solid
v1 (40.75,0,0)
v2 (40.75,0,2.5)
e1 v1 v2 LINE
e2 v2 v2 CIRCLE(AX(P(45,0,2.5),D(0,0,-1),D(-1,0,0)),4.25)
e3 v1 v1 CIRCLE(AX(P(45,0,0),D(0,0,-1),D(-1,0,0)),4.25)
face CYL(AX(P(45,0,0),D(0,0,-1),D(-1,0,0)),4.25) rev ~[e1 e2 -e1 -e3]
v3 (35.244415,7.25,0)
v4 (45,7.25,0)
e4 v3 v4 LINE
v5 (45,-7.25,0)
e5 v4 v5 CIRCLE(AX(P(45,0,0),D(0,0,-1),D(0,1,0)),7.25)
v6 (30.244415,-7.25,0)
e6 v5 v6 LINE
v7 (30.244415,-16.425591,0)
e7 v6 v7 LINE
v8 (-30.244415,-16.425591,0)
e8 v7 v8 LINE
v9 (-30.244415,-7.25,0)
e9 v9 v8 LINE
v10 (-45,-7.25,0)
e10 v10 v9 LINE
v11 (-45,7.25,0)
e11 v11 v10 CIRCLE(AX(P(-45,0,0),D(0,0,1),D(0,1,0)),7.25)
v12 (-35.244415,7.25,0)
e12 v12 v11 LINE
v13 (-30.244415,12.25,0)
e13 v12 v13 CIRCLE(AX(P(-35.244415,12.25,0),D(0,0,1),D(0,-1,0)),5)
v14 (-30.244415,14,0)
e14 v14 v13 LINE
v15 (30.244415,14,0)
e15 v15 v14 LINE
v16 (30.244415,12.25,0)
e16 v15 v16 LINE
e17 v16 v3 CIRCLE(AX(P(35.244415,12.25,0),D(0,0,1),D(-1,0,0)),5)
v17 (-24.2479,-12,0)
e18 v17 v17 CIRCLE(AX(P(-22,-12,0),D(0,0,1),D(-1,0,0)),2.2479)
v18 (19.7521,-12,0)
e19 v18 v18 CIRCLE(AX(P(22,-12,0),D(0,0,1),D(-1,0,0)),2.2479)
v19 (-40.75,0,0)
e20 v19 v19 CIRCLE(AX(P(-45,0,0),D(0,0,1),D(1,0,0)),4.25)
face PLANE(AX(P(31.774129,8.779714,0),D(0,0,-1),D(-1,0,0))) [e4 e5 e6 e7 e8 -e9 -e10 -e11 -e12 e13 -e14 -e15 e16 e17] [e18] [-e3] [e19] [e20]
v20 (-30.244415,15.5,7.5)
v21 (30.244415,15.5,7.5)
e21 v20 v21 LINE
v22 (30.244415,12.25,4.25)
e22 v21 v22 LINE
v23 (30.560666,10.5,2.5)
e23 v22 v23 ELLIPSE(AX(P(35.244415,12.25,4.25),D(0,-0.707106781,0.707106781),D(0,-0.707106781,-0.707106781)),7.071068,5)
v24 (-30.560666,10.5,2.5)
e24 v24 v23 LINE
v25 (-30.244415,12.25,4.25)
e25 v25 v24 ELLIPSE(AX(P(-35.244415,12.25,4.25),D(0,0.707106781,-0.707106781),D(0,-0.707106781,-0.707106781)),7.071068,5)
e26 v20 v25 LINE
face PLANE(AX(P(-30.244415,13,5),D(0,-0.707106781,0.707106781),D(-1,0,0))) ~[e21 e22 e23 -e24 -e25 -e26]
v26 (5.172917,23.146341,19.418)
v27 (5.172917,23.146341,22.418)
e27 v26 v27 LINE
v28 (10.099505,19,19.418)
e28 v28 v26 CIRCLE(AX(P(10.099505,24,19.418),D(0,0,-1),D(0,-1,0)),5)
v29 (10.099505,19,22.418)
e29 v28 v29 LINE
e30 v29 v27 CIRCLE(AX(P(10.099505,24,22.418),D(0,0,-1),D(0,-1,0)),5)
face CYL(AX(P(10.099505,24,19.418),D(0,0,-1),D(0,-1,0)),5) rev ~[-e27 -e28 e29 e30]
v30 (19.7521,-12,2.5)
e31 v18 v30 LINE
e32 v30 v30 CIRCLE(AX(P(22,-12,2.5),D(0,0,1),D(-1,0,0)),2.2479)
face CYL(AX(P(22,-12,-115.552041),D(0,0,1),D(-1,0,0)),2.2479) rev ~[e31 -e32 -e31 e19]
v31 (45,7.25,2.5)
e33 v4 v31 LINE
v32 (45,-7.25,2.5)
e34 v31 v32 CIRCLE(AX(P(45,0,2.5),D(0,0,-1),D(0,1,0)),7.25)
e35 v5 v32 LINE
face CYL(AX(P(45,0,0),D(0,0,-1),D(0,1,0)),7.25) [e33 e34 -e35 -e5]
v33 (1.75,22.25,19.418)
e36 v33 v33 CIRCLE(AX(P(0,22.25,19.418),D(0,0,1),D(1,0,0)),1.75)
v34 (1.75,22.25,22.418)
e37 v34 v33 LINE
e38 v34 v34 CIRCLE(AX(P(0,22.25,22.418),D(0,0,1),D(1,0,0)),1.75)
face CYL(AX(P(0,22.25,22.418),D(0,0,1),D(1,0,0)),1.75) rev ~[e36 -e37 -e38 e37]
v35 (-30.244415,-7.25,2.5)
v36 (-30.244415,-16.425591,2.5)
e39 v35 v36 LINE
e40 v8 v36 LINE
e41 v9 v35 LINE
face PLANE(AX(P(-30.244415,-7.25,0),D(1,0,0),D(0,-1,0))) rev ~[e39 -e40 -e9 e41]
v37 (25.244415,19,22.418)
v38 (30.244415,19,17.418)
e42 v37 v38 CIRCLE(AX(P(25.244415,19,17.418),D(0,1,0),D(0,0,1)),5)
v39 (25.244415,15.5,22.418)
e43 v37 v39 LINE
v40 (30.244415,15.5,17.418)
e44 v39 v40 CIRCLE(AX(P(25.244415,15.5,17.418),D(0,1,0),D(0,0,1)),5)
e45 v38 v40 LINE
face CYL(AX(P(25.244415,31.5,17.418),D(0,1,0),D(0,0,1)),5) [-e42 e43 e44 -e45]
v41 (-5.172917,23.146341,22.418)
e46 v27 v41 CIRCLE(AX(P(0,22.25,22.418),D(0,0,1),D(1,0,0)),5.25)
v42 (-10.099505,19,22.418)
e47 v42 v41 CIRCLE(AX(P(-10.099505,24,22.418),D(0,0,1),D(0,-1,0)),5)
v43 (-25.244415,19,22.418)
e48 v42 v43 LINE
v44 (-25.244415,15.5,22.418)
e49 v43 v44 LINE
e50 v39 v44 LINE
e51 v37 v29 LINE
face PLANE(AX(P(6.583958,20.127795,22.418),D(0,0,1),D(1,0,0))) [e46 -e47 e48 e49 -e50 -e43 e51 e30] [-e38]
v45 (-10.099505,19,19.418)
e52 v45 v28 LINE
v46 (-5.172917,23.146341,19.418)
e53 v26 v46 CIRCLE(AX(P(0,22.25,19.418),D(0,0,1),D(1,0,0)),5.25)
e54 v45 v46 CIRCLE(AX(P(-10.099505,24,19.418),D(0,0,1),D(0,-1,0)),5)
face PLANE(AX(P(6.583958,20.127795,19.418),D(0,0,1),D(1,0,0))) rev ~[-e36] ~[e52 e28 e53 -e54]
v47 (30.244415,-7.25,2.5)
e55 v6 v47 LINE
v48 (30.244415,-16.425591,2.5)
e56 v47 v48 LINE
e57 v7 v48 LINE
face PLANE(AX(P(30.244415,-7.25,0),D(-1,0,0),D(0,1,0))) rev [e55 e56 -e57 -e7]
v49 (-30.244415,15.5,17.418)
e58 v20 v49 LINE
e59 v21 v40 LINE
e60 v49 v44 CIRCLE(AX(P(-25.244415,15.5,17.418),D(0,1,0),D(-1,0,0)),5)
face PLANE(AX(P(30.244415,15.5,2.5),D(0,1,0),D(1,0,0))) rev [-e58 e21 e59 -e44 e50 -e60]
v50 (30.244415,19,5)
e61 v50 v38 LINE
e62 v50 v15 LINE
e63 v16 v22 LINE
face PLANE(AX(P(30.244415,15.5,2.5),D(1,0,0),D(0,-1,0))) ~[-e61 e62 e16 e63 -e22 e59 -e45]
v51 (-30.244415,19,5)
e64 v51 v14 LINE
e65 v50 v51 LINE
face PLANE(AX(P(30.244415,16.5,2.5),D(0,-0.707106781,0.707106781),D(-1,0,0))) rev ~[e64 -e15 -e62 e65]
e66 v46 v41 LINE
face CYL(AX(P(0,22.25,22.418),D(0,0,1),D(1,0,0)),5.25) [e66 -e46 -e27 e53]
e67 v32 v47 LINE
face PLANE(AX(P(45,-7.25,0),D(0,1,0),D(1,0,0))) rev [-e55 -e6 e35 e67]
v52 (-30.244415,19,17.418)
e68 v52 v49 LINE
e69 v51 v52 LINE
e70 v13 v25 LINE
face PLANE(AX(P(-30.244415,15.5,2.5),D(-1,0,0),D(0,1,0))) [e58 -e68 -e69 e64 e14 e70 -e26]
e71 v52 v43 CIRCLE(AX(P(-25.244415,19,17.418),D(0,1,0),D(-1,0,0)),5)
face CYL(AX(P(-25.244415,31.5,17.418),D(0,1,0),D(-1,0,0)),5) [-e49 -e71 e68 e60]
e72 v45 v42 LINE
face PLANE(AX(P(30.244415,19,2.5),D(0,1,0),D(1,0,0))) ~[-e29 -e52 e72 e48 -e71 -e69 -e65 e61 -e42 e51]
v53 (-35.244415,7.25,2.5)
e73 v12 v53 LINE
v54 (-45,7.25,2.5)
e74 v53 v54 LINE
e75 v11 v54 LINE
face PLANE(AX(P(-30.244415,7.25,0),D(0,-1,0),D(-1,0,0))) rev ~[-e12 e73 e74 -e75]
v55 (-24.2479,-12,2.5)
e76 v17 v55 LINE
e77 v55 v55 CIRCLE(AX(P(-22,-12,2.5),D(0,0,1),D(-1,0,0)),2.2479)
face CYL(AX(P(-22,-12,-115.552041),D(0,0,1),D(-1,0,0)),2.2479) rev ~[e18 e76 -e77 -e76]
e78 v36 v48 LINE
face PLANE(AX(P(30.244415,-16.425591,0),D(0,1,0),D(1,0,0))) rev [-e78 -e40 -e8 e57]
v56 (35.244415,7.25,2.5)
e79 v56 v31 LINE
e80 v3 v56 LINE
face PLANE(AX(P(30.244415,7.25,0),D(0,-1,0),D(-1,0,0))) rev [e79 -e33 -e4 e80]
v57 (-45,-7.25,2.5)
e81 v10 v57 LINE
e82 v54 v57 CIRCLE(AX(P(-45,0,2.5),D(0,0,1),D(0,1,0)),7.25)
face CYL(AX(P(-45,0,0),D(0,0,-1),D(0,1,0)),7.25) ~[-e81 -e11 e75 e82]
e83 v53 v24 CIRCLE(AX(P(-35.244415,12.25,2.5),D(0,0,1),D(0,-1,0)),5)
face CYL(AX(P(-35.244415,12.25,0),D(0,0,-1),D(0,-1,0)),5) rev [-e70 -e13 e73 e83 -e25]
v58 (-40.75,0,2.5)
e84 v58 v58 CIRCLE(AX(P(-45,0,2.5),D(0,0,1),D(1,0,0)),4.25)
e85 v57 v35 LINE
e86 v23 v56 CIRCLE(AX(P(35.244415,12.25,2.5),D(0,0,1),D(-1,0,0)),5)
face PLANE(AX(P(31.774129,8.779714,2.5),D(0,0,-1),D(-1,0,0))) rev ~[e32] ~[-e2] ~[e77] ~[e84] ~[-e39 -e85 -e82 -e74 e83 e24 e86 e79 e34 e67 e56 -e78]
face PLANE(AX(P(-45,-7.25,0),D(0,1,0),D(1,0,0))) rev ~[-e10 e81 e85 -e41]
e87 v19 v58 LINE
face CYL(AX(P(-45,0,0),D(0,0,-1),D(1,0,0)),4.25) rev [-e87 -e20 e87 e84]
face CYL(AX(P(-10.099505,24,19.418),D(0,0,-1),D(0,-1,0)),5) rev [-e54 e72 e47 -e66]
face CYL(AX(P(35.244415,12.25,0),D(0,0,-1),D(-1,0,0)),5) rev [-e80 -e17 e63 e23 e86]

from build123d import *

# Parameters (mm, degrees)
F0_R        = 4.25
F1_DEPTH    = 2.5
F2_W        = 30.2444149011
F2_H        = 3.5
F3_DEPTH    = 19.918
F5_R        = 1.75
F6_DEPTH    = 3
F8_D        = 4.4958
F9_T1_DEPTH = 2.5
F9_T3_DEPTH = 3
F9_T5_DEPTH = 28.5
F10_SIZE    = 5


# Not quite as in the source:
# - a fillet or chamfer that OpenCascade refuses, or shapes differently, is made with other operations: its cross-section is extruded or revolved along the edge and cut away or added


with BuildPart() as f1:
    # F0 (on Top) → F1 (new body)
    with BuildSketch(Plane.XY):
        with BuildLine():
            Line((-30.2444149011, 7.25), (-45, 7.25))
            ThreePointArc((-45, 7.25), (-52.25, 0), (-45, -7.25))
            Line((-45, -7.25), (-30.2444149011, -7.25))
            Line((-30.2444149011, -7.25), (-30.2444149011, -16.4255911708))
            Line((-30.2444149011, -16.4255911708), (0, -16.4255911708))
            Line((0, -16.4255911708), (0, 19))
            Line((0, 19), (-30.2444149011, 19))
            Line((-30.2444149011, 19), (-30.2444149011, 7.25))
        make_face()
        with Locations((-45, 0)):
            Circle(F0_R, mode=Mode.SUBTRACT)
    extrude(amount=F1_DEPTH)

    # F2 (on face) → F3 (join)
    with BuildSketch(Plane.XY.offset(2.5)):
        with Locations((-15.1222074506, 17.25)):
            Rectangle(F2_W, F2_H)
    extrude(amount=F3_DEPTH)

    # F4: F1 across plane


with BuildPart() as f1_1:
    add(f1.part)
    add(f1.part.mirror(Plane.YZ))

    # F5 (on face) → F6 (join)
    with BuildSketch(Plane.XY.offset(22.418)):
        with BuildLine():
            ThreePointArc((4.1231056256, 19), (4.9602824786, 20.5300878706), (5.25, 22.25))
            ThreePointArc((5.25, 22.25), (-1.7199121294, 27.2102824786), (-4.1231056256, 19))
            Line((-4.1231056256, 19), (4.1231056256, 19))
        make_face()
        with Locations((0, 22.25)):
            Circle(F5_R, mode=Mode.SUBTRACT)
    extrude(amount=-F6_DEPTH)

    # F8 (through all)
    with Locations(Plane(origin=(0, 0, 0), x_dir=(1, 0, 0), z_dir=(0, 0, -1))):
        with Locations((-22, 12), (22, 12)):
            Hole(F8_D / 2)

    # F9: fillet of radius 5 on 6 edges, made by hand

    # F9_s2 → F9_t1 (join)
    with BuildSketch(Plane.XY):
        with BuildLine():
            ThreePointArc((30.2444149011, 12.25), (31.7088809952, 8.7144660941), (35.2444149011, 7.25))
            Line((35.2444149011, 7.25), (30.2444149011, 7.25))
            Line((30.2444149011, 7.25), (30.2444149011, 12.25))
        make_face()
        with BuildLine():
            ThreePointArc((-35.2444149011, 7.25), (-31.7088809952, 8.7144660941), (-30.2444149011, 12.25))
            Line((-30.2444149011, 12.25), (-30.2444149011, 7.25))
            Line((-30.2444149011, 7.25), (-35.2444149011, 7.25))
        make_face()
    extrude(amount=F9_T1_DEPTH)

    # F9_s4 → F9_t3 (join)
    with BuildSketch(Plane.XY.offset(19.418)):
        with BuildLine():
            ThreePointArc((10.0995049384, 19), (6.8799003573, 20.1745397216), (5.1729171636, 23.1463414634))
            ThreePointArc((5.1729171636, 23.1463414634), (5.0894053491, 20.9614142663), (4.1231056256, 19))
            Line((4.1231056256, 19), (10.0995049384, 19))
        make_face()
        with BuildLine():
            ThreePointArc((-10.0995049384, 19), (-6.8799003573, 20.1745397216), (-5.1729171636, 23.1463414634))
            ThreePointArc((-5.1729171636, 23.1463414634), (-5.0894053491, 20.9614142663), (-4.1231056256, 19))
            Line((-4.1231056256, 19), (-10.0995049384, 19))
        make_face()
    extrude(amount=F9_T3_DEPTH)

    # F9_s6 → F9_t5 (cut)
    with BuildSketch(Plane.XZ.offset(-31.5)):
        with BuildLine():
            ThreePointArc((-30.2444149011, 17.418), (-28.7799488071, 20.9535339059), (-25.2444149011, 22.418))
            Line((-25.2444149011, 22.418), (-30.2444149011, 22.418))
            Line((-30.2444149011, 22.418), (-30.2444149011, 17.418))
        make_face()
        with BuildLine():
            ThreePointArc((25.2444149011, 22.418), (28.7799488071, 20.9535339059), (30.2444149011, 17.418))
            Line((30.2444149011, 17.418), (30.2444149011, 22.418))
            Line((30.2444149011, 22.418), (25.2444149011, 22.418))
        make_face()
    extrude(amount=F9_T5_DEPTH, mode=Mode.SUBTRACT)

    # F10
    f10_edges = [f1_1.edges().sort_by_distance(p)[0] for p in [
        (0, 19, 0),
        (0, 15.5, 2.5),
    ]]
    chamfer(f10_edges, length=F10_SIZE)


solid = f1_1.part
